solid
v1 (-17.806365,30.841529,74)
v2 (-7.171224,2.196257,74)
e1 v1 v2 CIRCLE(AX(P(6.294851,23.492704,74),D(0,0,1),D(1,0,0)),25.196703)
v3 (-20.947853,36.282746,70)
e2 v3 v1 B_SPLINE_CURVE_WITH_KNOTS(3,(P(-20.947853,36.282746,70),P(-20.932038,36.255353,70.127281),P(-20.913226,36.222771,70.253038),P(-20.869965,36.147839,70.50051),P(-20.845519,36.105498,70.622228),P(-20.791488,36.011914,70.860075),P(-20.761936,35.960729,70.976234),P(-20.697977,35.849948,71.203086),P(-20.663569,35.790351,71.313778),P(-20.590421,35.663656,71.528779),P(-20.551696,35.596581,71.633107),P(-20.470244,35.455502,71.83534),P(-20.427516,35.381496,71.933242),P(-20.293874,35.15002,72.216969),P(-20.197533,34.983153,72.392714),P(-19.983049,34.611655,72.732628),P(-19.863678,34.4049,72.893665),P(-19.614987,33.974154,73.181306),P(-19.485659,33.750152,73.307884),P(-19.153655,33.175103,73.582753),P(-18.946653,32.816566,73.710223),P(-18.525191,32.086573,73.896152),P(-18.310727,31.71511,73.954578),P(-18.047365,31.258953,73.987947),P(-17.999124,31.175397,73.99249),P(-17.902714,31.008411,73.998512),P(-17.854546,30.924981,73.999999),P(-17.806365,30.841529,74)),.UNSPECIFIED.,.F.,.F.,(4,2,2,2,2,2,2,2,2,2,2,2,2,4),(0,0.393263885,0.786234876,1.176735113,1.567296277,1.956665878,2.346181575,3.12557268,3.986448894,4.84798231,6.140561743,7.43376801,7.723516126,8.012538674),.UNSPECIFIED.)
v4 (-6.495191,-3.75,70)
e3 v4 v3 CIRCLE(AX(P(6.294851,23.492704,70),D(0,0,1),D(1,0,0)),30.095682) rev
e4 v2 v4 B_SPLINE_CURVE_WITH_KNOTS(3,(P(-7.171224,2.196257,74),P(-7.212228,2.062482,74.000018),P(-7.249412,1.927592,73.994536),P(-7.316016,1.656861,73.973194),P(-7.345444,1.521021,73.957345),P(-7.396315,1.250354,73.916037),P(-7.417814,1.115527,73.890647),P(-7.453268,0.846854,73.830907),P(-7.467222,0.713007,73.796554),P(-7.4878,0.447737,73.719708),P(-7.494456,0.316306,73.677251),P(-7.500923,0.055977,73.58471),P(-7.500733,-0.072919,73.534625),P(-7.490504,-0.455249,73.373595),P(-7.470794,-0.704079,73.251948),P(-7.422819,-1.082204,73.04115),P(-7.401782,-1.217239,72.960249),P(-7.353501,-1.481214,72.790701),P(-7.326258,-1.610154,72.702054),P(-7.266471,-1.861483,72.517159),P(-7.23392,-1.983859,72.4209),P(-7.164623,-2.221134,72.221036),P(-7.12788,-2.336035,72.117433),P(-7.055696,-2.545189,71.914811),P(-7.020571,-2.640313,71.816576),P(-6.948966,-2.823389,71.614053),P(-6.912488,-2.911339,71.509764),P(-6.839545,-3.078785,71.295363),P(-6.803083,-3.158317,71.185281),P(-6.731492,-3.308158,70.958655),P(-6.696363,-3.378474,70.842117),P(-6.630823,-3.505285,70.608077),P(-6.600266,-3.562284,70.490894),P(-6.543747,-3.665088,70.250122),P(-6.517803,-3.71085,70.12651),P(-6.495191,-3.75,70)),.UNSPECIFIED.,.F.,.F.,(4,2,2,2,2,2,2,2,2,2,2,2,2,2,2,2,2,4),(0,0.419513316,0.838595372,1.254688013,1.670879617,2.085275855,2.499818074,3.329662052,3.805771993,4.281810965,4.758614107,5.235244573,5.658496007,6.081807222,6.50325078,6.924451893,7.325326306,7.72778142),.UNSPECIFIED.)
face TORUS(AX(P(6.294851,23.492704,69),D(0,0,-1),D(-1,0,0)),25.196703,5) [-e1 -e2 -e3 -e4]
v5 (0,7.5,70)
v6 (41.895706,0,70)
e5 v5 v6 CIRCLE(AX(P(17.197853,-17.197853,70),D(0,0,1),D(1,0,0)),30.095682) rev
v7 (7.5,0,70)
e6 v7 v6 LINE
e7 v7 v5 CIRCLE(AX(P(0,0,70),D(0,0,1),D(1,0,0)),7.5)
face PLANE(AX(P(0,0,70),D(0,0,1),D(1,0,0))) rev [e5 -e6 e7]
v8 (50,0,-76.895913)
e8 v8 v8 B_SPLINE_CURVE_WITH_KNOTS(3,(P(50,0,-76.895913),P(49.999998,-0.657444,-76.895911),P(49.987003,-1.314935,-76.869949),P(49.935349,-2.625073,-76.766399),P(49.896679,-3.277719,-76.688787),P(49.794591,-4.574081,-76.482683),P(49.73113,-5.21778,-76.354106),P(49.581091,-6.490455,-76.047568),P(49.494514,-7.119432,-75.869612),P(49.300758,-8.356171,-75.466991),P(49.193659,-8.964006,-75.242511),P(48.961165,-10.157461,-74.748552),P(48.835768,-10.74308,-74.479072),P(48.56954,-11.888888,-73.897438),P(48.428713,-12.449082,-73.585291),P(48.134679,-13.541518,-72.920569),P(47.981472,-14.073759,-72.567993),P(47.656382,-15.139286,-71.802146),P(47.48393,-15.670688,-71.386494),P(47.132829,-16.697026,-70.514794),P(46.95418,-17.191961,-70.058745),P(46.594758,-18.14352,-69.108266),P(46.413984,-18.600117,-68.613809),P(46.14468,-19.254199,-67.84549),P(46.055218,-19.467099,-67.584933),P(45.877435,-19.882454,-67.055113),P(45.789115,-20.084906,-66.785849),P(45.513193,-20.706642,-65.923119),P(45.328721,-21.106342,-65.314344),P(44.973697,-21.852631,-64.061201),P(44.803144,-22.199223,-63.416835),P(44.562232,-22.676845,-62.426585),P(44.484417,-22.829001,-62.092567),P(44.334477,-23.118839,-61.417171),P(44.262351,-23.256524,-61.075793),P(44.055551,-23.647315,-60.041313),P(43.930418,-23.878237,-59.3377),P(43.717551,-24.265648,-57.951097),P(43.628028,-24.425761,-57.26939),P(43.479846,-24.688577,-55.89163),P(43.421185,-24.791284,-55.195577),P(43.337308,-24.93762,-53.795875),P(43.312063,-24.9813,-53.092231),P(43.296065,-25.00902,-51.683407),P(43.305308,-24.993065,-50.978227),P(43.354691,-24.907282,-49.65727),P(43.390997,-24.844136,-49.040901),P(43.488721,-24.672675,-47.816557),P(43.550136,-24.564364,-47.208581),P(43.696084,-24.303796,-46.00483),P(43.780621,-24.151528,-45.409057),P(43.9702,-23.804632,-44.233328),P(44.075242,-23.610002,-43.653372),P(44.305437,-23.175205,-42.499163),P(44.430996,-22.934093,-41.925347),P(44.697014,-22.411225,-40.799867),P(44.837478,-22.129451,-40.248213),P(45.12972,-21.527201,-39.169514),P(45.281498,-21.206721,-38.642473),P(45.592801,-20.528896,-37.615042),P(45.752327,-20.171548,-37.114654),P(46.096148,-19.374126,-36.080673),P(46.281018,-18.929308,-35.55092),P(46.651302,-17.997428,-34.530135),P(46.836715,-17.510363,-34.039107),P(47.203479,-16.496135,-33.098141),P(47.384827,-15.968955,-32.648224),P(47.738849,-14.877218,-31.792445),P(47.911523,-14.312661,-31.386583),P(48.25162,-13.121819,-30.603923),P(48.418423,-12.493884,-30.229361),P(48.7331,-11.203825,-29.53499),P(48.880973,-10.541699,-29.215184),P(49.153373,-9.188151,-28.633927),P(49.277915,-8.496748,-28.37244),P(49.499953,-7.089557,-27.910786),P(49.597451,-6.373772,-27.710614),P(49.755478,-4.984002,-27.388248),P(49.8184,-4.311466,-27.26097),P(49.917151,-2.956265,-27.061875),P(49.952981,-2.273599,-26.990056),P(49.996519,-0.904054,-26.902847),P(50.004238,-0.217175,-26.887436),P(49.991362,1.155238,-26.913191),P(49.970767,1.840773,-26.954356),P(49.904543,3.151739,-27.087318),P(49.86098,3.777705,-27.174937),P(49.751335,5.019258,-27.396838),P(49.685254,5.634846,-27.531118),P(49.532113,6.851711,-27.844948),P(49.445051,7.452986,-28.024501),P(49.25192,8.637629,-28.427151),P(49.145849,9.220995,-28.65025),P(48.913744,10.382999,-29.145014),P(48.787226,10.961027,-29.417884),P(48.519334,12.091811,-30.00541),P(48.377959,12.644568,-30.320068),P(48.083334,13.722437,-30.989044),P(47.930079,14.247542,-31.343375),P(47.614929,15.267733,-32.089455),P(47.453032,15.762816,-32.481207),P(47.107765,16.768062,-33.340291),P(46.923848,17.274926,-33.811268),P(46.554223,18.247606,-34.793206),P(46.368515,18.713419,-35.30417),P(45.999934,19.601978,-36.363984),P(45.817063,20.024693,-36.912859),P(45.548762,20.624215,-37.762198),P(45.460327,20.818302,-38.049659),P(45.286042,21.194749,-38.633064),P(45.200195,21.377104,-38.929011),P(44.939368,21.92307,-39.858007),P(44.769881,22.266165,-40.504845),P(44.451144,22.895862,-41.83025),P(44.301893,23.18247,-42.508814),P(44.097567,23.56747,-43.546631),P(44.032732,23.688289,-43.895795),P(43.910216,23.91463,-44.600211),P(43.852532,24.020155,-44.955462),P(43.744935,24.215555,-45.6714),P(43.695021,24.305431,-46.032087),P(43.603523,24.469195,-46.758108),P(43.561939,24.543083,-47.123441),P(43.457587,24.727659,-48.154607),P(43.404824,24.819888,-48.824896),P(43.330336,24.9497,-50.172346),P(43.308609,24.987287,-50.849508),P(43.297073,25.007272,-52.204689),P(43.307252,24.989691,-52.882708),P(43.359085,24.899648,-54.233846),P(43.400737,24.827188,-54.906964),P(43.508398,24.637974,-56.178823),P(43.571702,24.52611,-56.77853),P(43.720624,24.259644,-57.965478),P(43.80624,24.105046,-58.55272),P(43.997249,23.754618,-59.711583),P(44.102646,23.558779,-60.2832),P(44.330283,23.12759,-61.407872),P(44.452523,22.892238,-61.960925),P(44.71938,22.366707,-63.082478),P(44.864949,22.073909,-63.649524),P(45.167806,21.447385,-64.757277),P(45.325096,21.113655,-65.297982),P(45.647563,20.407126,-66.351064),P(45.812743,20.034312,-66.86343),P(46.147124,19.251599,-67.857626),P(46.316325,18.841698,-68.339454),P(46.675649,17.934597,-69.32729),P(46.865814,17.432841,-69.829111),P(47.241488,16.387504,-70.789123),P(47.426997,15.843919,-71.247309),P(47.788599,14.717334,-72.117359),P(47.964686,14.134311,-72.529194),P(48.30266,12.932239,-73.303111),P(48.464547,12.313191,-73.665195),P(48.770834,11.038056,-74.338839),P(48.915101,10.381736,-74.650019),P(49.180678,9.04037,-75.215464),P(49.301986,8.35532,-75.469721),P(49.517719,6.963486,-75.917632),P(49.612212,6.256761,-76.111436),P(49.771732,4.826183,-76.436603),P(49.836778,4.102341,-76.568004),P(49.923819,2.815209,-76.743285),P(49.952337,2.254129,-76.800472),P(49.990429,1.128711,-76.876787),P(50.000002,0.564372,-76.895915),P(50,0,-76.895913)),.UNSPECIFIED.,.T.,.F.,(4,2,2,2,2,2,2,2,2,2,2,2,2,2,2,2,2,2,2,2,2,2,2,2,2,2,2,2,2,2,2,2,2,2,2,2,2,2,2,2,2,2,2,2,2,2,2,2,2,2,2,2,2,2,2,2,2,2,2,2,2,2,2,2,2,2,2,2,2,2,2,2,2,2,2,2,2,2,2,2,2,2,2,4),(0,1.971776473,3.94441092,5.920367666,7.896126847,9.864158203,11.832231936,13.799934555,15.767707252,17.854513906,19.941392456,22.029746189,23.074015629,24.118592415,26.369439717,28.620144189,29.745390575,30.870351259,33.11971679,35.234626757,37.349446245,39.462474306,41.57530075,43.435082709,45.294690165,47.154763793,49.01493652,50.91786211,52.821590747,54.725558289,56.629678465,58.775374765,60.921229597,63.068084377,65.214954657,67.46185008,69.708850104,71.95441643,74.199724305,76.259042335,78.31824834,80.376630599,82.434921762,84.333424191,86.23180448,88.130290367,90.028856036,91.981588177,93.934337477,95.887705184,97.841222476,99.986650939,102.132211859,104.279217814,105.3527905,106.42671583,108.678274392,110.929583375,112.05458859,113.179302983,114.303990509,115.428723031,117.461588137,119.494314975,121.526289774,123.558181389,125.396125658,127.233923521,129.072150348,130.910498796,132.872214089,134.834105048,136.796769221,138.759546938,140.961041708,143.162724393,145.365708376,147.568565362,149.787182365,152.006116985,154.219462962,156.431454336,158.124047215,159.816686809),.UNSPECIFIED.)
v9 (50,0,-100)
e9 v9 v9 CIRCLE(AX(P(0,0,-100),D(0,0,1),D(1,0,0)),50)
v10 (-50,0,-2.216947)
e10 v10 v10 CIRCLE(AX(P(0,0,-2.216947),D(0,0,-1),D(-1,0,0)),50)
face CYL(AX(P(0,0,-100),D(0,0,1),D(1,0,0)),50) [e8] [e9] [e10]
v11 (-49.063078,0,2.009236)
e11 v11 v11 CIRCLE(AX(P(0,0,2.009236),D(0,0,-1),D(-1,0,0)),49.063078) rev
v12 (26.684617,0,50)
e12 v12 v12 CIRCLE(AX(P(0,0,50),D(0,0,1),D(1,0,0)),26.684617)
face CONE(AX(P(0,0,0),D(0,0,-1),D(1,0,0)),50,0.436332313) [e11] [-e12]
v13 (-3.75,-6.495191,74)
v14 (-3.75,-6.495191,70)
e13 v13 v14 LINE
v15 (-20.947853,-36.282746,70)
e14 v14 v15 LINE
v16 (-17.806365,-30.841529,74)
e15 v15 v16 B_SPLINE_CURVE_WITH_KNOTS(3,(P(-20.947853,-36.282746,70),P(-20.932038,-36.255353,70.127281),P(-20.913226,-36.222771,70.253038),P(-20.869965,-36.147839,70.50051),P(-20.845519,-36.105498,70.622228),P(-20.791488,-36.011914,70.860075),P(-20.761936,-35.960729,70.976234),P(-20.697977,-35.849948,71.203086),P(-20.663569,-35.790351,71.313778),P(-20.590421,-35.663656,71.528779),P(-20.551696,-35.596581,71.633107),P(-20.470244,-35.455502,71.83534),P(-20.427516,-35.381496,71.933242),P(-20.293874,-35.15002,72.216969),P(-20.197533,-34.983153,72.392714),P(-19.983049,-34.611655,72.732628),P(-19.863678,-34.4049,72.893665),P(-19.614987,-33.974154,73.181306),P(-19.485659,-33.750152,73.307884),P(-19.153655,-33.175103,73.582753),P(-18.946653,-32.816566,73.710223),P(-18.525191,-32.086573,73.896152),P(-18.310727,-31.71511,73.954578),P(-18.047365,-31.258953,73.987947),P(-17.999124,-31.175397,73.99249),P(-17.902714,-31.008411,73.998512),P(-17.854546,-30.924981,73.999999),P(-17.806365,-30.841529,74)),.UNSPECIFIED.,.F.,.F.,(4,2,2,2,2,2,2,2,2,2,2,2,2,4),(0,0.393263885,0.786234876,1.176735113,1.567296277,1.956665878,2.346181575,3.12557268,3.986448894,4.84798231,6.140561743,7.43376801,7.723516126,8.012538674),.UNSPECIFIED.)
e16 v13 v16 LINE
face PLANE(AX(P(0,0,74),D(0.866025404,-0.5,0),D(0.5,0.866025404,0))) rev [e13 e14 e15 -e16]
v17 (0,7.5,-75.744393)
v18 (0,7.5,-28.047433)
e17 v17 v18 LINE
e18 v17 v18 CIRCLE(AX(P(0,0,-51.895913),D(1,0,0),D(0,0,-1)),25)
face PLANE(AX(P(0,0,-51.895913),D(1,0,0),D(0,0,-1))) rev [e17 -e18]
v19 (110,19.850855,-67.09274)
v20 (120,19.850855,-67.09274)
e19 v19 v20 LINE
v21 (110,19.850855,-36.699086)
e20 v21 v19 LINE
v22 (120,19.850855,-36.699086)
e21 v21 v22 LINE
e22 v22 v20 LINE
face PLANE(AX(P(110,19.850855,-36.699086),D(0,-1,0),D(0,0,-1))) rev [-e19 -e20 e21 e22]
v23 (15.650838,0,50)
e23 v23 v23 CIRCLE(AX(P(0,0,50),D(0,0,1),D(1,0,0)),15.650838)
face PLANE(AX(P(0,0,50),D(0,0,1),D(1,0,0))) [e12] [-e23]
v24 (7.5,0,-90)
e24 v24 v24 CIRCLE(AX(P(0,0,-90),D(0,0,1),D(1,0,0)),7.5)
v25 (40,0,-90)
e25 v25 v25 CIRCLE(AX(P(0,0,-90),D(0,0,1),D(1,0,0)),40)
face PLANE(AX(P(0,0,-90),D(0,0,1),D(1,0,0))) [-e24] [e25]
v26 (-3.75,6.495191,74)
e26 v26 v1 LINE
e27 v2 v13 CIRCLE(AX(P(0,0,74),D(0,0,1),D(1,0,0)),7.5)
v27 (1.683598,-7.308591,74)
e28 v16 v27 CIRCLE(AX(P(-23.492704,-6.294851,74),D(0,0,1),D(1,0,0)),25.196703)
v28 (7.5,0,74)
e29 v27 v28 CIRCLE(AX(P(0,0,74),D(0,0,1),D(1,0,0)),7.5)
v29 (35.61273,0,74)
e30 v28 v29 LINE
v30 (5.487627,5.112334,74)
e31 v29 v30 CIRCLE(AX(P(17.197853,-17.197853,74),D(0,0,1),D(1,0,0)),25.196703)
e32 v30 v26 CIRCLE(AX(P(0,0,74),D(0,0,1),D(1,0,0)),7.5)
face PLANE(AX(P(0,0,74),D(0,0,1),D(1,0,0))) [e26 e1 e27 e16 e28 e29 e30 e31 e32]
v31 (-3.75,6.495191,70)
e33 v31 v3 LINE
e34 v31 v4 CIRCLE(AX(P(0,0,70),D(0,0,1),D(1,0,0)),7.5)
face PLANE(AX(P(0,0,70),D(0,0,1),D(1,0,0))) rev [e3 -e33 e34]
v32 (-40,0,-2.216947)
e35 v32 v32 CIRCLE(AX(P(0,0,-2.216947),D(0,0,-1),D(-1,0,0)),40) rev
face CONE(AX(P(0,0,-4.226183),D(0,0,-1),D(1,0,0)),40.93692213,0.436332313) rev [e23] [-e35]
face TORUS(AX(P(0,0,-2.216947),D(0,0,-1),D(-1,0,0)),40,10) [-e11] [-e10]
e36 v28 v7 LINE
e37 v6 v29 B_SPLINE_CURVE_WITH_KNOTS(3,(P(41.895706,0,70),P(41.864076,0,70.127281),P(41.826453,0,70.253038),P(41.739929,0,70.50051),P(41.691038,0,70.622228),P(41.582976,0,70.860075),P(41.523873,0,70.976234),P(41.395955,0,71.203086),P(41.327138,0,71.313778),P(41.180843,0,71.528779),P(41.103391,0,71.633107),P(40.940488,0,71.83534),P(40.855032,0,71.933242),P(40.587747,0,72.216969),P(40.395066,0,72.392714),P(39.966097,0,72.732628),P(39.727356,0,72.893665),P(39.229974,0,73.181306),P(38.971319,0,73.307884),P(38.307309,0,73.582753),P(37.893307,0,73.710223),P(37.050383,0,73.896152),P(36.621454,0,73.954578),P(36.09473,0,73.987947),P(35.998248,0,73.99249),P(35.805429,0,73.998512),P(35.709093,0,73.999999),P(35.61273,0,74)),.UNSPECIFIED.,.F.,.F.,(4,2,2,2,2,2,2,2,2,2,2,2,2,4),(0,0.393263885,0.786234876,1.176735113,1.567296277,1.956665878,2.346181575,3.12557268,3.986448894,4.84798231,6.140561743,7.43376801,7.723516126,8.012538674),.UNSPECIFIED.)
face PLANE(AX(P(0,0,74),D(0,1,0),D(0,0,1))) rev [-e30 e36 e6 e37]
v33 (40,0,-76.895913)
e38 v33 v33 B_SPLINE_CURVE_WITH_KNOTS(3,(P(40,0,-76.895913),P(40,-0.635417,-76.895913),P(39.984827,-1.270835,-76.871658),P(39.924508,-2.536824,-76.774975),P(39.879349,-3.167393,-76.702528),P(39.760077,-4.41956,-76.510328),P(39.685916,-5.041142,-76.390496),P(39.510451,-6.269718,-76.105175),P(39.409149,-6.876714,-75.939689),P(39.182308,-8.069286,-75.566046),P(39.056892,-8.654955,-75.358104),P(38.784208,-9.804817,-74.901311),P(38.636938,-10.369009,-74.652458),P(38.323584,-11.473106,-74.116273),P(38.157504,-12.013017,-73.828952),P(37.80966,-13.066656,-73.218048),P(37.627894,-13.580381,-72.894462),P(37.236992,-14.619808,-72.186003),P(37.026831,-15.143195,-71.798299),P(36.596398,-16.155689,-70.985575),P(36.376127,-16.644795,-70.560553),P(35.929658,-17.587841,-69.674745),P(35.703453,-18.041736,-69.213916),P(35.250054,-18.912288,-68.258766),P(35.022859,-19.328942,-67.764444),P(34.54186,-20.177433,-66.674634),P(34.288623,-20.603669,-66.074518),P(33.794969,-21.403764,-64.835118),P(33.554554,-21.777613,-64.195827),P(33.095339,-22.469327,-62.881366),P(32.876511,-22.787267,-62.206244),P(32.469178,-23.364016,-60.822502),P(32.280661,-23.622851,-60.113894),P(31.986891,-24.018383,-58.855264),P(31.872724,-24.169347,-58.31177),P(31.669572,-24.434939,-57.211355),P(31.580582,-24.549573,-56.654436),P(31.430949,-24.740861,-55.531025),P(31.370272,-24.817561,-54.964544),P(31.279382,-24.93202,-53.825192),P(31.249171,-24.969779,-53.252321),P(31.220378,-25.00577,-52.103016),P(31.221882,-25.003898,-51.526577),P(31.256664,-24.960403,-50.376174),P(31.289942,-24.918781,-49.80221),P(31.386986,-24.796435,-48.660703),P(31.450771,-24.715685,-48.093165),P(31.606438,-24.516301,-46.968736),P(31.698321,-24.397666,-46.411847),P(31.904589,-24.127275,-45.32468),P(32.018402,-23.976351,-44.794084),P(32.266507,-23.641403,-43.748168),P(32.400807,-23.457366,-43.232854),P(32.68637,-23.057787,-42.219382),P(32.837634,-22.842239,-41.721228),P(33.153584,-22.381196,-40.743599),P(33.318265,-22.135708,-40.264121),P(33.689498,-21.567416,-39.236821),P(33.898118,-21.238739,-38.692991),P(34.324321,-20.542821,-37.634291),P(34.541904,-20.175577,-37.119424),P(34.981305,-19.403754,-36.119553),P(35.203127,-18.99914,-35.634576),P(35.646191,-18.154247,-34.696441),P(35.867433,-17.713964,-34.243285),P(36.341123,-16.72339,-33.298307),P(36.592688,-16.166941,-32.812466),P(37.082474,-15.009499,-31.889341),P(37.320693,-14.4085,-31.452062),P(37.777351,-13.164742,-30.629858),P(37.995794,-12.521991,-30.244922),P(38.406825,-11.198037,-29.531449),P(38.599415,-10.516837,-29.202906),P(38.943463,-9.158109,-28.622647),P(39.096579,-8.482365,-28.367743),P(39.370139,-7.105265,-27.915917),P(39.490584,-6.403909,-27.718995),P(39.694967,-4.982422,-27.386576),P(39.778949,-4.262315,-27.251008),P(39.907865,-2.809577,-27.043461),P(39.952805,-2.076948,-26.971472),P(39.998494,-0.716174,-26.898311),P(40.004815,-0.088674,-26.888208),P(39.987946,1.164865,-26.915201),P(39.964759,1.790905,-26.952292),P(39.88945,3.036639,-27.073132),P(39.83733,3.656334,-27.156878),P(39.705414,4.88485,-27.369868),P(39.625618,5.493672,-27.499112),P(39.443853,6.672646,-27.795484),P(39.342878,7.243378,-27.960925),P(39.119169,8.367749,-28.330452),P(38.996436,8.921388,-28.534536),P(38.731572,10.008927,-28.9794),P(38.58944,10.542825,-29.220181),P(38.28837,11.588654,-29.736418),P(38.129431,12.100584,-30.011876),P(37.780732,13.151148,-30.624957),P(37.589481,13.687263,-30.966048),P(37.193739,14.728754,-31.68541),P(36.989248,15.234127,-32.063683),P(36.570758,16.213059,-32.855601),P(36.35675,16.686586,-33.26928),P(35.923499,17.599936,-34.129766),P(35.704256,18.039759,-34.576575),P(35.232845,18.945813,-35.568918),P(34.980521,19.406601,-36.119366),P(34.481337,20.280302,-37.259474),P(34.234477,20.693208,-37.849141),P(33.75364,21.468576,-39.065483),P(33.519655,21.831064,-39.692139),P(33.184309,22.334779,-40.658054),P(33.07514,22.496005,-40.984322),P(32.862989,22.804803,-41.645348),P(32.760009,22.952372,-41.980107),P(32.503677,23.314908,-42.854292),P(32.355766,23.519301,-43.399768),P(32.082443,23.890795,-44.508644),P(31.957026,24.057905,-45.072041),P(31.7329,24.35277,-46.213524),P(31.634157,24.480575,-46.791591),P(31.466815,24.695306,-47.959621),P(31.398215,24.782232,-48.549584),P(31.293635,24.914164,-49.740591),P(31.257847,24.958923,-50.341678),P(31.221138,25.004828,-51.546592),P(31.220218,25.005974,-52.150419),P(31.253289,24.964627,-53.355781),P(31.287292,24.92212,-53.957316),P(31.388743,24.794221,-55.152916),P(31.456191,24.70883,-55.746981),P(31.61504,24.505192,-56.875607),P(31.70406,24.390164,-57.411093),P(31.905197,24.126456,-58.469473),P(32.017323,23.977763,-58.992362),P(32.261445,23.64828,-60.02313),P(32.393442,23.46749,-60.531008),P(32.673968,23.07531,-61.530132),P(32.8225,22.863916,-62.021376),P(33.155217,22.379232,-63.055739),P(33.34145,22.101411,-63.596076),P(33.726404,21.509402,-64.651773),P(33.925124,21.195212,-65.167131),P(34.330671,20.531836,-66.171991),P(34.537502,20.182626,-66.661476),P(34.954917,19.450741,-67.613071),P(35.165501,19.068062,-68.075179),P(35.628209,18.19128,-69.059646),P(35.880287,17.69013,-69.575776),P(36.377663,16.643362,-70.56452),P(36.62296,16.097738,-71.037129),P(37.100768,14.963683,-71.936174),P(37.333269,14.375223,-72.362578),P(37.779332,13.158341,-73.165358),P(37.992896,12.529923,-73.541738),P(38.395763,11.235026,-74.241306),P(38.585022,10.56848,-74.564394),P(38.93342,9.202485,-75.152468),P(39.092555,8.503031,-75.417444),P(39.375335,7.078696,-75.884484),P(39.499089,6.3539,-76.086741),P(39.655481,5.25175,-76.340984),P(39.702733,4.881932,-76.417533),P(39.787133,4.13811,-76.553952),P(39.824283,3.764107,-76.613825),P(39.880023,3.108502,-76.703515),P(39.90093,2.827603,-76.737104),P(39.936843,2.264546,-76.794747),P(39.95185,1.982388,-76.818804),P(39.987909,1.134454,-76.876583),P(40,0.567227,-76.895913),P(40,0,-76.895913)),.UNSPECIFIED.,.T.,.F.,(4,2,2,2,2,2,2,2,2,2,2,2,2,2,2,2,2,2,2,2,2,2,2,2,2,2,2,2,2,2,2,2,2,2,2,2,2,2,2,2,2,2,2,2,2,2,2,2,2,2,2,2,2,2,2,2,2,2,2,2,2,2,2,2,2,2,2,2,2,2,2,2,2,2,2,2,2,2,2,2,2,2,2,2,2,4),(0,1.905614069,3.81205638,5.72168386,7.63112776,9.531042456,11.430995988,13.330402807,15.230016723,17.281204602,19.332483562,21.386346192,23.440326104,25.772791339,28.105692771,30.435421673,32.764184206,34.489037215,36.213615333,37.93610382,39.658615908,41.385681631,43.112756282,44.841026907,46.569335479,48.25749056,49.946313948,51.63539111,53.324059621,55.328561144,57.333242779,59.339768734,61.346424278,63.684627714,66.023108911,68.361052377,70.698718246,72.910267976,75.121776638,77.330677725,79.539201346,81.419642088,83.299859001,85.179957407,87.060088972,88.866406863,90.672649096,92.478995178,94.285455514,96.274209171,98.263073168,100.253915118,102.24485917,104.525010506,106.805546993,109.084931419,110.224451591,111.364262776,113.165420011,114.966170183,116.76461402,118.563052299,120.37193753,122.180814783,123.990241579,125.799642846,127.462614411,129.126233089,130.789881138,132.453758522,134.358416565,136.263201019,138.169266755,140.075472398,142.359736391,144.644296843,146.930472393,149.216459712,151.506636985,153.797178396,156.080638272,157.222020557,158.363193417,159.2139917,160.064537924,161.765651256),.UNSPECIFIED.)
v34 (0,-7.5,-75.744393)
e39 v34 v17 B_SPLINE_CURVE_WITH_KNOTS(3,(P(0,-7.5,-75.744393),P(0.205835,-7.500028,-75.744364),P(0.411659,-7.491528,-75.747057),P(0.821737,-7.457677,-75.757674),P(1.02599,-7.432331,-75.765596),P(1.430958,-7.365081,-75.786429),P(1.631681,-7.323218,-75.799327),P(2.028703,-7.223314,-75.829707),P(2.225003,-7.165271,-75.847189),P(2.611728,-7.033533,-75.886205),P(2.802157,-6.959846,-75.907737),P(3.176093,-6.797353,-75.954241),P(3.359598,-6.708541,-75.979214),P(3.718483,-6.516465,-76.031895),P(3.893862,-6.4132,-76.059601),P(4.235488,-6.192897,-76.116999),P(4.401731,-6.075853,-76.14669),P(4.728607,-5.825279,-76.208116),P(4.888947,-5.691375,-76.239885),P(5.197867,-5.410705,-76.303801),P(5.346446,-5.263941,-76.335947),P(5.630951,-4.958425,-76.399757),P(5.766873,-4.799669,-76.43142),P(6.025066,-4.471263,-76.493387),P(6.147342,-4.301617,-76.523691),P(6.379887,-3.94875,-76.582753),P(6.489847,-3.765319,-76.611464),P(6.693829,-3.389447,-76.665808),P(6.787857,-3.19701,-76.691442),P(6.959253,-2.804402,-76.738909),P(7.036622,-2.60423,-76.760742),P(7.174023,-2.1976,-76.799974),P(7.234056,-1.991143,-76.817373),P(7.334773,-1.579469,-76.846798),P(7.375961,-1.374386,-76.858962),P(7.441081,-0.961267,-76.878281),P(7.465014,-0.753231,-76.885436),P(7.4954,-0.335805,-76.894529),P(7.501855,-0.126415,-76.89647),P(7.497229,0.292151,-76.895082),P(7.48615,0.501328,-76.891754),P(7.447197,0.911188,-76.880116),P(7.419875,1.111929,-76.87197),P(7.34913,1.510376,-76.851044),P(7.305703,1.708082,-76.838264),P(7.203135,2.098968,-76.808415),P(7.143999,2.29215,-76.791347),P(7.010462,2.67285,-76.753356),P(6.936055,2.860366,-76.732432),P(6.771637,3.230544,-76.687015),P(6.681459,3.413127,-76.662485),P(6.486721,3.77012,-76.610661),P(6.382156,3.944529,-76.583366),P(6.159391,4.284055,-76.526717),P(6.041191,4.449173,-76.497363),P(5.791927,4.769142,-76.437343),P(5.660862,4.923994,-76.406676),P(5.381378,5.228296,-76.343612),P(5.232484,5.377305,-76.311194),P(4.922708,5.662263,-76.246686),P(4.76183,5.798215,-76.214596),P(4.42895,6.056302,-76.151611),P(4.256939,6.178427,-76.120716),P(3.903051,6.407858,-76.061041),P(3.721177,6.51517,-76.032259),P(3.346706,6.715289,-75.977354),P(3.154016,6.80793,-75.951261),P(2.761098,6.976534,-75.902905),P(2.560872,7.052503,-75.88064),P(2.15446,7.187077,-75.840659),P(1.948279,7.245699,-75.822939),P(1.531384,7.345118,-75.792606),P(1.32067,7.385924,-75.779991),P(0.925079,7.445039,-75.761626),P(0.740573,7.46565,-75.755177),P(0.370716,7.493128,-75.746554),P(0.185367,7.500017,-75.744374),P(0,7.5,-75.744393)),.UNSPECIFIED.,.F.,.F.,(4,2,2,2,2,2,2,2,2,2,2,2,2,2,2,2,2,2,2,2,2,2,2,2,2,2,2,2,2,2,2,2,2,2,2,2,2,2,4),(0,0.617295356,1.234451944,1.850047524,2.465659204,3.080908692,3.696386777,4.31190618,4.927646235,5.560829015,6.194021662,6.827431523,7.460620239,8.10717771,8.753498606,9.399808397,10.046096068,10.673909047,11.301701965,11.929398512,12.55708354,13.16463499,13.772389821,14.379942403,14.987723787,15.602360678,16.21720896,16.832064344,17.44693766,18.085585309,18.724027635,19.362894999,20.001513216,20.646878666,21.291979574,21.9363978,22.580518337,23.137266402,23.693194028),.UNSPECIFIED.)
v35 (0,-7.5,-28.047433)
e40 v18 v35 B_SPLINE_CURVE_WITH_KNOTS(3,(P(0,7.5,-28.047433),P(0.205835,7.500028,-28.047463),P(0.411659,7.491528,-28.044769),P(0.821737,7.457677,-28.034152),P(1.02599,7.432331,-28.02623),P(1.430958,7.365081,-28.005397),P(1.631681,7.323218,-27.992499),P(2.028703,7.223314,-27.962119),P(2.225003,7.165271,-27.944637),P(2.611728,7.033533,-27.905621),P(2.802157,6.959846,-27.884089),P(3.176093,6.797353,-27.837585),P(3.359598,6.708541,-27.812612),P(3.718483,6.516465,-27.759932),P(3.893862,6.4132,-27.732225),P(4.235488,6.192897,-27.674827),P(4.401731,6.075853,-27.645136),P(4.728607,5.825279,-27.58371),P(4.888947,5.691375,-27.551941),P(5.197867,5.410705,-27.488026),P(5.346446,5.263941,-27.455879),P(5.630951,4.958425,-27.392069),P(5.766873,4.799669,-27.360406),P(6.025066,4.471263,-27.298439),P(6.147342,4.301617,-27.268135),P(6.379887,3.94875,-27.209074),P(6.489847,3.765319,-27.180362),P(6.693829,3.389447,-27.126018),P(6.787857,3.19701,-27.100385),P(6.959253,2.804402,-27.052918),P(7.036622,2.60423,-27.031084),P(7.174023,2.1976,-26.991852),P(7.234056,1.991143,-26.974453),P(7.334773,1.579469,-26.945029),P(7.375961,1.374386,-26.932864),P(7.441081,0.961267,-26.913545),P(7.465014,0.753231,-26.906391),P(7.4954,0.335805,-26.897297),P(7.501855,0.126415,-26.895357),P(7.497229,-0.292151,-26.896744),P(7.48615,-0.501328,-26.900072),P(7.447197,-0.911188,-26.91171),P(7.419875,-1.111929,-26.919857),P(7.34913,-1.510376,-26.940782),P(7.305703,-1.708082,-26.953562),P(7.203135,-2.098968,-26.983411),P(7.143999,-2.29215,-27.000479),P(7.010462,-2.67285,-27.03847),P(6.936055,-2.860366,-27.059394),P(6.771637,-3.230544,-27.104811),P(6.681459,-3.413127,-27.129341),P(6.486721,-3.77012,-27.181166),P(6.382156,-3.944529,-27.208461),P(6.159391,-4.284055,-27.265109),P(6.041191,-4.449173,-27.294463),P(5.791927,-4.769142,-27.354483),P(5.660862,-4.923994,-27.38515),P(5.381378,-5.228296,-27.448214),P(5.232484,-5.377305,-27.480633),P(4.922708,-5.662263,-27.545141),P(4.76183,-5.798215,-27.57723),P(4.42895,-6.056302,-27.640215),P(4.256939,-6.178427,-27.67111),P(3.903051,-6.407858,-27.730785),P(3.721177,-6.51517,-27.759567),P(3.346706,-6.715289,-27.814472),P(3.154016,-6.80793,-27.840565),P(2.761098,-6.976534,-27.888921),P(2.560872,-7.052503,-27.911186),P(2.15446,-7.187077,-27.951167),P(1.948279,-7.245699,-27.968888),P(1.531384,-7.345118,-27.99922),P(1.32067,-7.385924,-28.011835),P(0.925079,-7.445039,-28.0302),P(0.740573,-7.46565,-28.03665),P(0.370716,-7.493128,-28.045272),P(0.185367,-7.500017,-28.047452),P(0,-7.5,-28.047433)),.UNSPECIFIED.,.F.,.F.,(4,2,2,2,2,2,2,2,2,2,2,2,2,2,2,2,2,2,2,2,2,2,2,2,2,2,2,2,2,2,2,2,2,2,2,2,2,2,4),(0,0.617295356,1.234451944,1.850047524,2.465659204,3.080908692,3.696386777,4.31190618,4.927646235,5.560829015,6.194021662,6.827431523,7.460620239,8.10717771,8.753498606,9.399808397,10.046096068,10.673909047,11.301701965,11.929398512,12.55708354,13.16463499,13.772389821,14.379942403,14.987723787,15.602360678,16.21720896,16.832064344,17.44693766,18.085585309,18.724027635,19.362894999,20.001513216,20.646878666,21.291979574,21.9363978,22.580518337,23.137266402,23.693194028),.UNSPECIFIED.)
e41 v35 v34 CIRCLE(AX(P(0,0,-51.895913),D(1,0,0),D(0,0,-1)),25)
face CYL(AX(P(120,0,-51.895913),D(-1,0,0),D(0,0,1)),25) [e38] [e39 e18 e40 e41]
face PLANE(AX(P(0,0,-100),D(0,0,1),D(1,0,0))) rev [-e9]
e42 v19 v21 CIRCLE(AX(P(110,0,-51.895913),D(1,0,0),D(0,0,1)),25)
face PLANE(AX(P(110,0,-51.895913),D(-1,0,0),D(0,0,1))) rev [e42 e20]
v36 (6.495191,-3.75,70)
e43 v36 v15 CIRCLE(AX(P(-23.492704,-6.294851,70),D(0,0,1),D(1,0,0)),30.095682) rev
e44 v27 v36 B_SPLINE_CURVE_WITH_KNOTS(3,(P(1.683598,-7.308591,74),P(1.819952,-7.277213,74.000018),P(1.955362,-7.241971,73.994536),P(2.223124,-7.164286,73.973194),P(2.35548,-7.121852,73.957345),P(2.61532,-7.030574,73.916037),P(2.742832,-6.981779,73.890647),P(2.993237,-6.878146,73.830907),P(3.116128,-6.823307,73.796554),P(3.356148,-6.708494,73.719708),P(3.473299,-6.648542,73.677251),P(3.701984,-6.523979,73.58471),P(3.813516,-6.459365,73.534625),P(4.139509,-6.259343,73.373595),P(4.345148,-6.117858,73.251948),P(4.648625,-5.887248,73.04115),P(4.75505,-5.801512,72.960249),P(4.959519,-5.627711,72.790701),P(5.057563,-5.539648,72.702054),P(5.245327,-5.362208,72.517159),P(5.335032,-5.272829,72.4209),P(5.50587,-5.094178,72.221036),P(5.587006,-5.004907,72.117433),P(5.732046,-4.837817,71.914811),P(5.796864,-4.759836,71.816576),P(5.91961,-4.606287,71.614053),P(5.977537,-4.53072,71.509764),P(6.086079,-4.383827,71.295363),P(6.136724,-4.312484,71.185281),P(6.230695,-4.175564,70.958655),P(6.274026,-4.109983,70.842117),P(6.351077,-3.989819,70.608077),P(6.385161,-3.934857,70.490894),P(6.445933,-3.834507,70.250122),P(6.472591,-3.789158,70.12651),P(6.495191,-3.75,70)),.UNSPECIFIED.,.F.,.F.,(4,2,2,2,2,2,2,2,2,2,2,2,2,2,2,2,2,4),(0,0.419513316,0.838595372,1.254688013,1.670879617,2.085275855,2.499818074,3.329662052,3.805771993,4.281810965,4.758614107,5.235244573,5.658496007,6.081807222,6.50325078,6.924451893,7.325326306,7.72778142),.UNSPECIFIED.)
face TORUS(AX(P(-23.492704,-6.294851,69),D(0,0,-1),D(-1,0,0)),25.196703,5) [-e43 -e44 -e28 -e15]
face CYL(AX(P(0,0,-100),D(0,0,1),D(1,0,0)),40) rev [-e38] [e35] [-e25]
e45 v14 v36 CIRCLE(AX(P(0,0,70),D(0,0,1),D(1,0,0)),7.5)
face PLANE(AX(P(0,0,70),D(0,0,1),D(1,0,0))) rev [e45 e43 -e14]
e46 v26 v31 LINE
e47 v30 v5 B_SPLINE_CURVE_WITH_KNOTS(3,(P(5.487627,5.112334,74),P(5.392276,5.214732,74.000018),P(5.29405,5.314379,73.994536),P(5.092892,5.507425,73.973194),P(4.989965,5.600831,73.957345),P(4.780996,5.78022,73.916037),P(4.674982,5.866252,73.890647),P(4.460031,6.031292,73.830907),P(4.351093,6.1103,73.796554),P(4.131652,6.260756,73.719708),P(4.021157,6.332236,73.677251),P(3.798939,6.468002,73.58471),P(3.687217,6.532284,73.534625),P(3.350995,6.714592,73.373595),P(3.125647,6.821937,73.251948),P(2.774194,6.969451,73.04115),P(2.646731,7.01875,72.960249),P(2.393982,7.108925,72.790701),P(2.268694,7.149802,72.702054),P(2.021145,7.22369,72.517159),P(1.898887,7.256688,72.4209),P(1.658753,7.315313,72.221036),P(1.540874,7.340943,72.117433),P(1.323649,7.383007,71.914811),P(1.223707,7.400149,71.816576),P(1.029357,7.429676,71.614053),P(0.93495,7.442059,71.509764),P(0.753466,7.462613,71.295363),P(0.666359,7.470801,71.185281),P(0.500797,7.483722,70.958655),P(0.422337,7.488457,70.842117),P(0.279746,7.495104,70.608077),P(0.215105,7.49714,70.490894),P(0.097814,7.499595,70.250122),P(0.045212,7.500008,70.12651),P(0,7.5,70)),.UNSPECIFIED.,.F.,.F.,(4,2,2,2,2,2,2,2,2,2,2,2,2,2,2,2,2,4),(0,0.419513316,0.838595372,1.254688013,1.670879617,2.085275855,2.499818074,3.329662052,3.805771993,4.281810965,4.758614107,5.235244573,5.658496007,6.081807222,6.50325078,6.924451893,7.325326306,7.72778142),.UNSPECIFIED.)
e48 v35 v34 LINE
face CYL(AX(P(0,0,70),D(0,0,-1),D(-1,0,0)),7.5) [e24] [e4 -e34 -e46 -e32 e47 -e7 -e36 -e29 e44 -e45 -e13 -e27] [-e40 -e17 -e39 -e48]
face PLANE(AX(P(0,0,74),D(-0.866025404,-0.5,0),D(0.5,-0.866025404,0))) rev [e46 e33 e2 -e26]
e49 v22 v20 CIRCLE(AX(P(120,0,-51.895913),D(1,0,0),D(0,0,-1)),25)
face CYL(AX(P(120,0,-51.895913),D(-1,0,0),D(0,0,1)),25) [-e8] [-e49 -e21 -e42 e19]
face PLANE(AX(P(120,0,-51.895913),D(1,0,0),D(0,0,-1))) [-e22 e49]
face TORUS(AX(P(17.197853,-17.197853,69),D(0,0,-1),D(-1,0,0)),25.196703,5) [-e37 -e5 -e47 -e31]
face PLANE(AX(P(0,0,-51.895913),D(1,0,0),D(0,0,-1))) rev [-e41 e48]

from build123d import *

# Parameters (mm, degrees)
SKETCH1_R                     = 50
BOSS_EXTRUDE1_DEPTH           = 100
BOSS_EXTRUDE1_OTHER_WAY_DEPTH = 50
BOSS_EXTRUDE1_OTHER_WAY_TAPER = 25
FILLET1_R                     = 10
SKETCH2_R                     = 7.5
BOSS_EXTRUDE2_DEPTH           = 160
SKETCH3_R                     = 7.5
BOSS_EXTRUDE3_DEPTH           = 4
FILLET2_R                     = 5
SKETCH4_R                     = 25
BOSS_EXTRUDE4_DEPTH           = 120
CUT_EXTRUDE2_START            = -10
CUT_EXTRUDE2_DEPTH            = 10


with BuildPart() as part:
    # Sketch1 → Boss-Extrude1 (new body)
    with BuildSketch(Plane.XY):
        Circle(SKETCH1_R)
    extrude(amount=-BOSS_EXTRUDE1_DEPTH)

    # Sketch1 → Boss-Extrude1 other way (add)
    with BuildSketch(Plane.XY):
        Circle(SKETCH1_R)
    extrude(amount=BOSS_EXTRUDE1_OTHER_WAY_DEPTH, taper=BOSS_EXTRUDE1_OTHER_WAY_TAPER)

    # Fillet1
    fillet1_edges = [part.edges().sort_by_distance(p)[0] for p in [
        (-50, 0, 0),
    ]]
    fillet(fillet1_edges, radius=FILLET1_R)

    # Shell2: read off the stored shape, not the designer's step
    # Shell2 outline → Shell2 (revolve, cut)
    with BuildSketch(Plane.XZ):
        Polygon((0, -90), (40, -90), (40, -2.216946626), (15.650837903, 50), (0, 50), align=None)
    revolve(axis=Axis((0, 0, 0), (0, 0, 1)), mode=Mode.SUBTRACT)

    # Sketch2 → Boss-Extrude2 (add)
    with BuildSketch(Plane.XY.offset(-90)):
        with Locations(Location((0, 0, 0), (0, 0, 180))):
            Circle(SKETCH2_R)
    extrude(amount=BOSS_EXTRUDE2_DEPTH)

    # Sketch3 → Boss-Extrude3 (add)
    with BuildSketch(Plane.XY.offset(70)):
        with BuildLine():
            ThreePointArc((0, 7.5), (5.303300859, 5.303300859), (7.5, 0))
            Line((7.5, 0), (41.895706174, 0))
            ThreePointArc((41.895706174, 0), (22.501153946, 12.426884851), (0, 7.5))
        make_face()
        with BuildLine():
            ThreePointArc((-6.495190528, -3.75), (-7.244443697, 1.941142838), (-3.75, 6.495190528))
            Line((-3.75, 6.495190528), (-20.947853087, 36.282745856))
            ThreePointArc((-20.947853087, 36.282745856), (-22.012574944, 13.273128506), (-6.495190528, -3.75))
        make_face()
        with BuildLine():
            ThreePointArc((-20.947853087, -36.282745856), (-0.488579002, -25.700013357), (6.495190528, -3.75))
            ThreePointArc((6.495190528, -3.75), (1.941142838, -7.244443697), (-3.75, -6.495190528))
            Line((-3.75, -6.495190528), (-20.947853087, -36.282745856))
        make_face()
        Circle(SKETCH3_R)
    extrude(amount=BOSS_EXTRUDE3_DEPTH)

    # Fillet2
    # the kernel refuses this fillet: 5 mm, written as the material it takes off along each edge
    with BuildSketch(Plane(origin=(17.197853087, -17.197853087, 74), x_dir=(0.979838516120554, 0.1997910967152214, 0), z_dir=(0.1997910967152214, -0.979838516120554, 0))) as fillet2_piece_1_section:
        with BuildLine():
            CenterArc((25.196702894, -5), FILLET2_R, 11.536959033, 78.463040967)
            Line((30.09568238, -4), (30.09568238, 0))
            Line((30.09568238, 0), (25.196702894, 0))
        make_face()
    fillet2_piece_1 = revolve(axis=Axis((17.197853087, -17.197853087, 74), (0, 0, 1)), revolution_arc=136.651808839, mode=Mode.PRIVATE)
    fillet2_piece_1 = fillet2_piece_1 - Plane(origin=(0, 0, 74), x_dir=(-1, 0, 0), z_dir=(0, 0, -1)) * Cylinder(7.5, 121, mode=Mode.PRIVATE)
    fillet2_piece_1 = split(fillet2_piece_1, bisect_by=Plane(origin=(17.197853087, 0, 74), z_dir=(0, 1, 0)), keep=Keep.TOP, mode=Mode.PRIVATE)
    add(fillet2_piece_1, mode=Mode.SUBTRACT)
    with BuildSketch(Plane(origin=(-23.492704207, -6.29485112, 74), x_dir=(-0.31689509285493905, -0.9484605949244596, 0), z_dir=(-0.9484605949244596, 0.31689509285493905, 0))) as fillet2_piece_2_section:
        with BuildLine():
            CenterArc((25.196702894, -5), FILLET2_R, 11.536959033, 78.463040967)
            Line((30.09568238, -4), (30.09568238, 0))
            Line((30.09568238, 0), (25.196702894, 0))
        make_face()
    fillet2_piece_2 = revolve(axis=Axis((-23.492704207, -6.29485112, 74), (0, 0, 1)), revolution_arc=136.651808839, mode=Mode.PRIVATE)
    fillet2_piece_2 = fillet2_piece_2 - Plane(origin=(0, 0, 74), x_dir=(-1, 0, 0), z_dir=(0, 0, -1)) * Cylinder(7.5, 121, mode=Mode.PRIVATE)
    fillet2_piece_2 = split(fillet2_piece_2, bisect_by=Plane(origin=(-8.598926543, -14.893777664, 74), z_dir=(0.8660254037844364, -0.500000000000004, 0)), keep=Keep.TOP, mode=Mode.PRIVATE)
    add(fillet2_piece_2, mode=Mode.SUBTRACT)
    with BuildSketch(Plane(origin=(6.29485112, 23.492704207, 74), x_dir=(-0.6629434232656098, 0.7486694982092396, 0), z_dir=(0.7486694982092396, 0.6629434232656098, 0))) as fillet2_piece_3_section:
        with BuildLine():
            CenterArc((25.196702894, -5), FILLET2_R, 11.536959033, 78.463040967)
            Line((25.196702894, 0), (30.09568238, 0))
            Line((30.09568238, 0), (30.09568238, -4))
        make_face()
    fillet2_piece_3 = revolve(axis=Axis((6.29485112, 23.492704207, 74), (0, 0, 1)), revolution_arc=136.651808839, mode=Mode.PRIVATE)
    fillet2_piece_3 = fillet2_piece_3 - Plane(origin=(0, 0, 74), x_dir=(-1, 0, 0), z_dir=(0, 0, -1)) * Cylinder(7.5, 121, mode=Mode.PRIVATE)
    fillet2_piece_3 = split(fillet2_piece_3, bisect_by=Plane(origin=(-8.598926543, 14.893777664, 74), z_dir=(-0.8660254037844434, -0.49999999999999206, 0)), keep=Keep.TOP, mode=Mode.PRIVATE)
    add(fillet2_piece_3, mode=Mode.SUBTRACT)

    # Sketch4 → Boss-Extrude4 (add)
    with BuildSketch(Plane(origin=(0, 0, 0), x_dir=(0, 0, -1), z_dir=(1, 0, 0))):
        with Locations(Location((51.895913136, 0, 0), (0, 0, 180))):
            Circle(SKETCH4_R)
    extrude(amount=BOSS_EXTRUDE4_DEPTH)

    # Sketch5 → Cut-Extrude2 (cut)
    with BuildSketch(Plane(origin=(120, 0, 0), x_dir=(0, 0, -1), z_dir=(1, 0, 0)).offset(CUT_EXTRUDE2_START)):
        with BuildLine():
            Line((36.699086206, 19.850855177), (67.092740066, 19.850855177))
            ThreePointArc((67.092740066, 19.850855177), (51.895913136, 25), (36.699086206, 19.850855177))
        make_face()
    extrude(amount=CUT_EXTRUDE2_DEPTH, mode=Mode.SUBTRACT)


solid = part.part
